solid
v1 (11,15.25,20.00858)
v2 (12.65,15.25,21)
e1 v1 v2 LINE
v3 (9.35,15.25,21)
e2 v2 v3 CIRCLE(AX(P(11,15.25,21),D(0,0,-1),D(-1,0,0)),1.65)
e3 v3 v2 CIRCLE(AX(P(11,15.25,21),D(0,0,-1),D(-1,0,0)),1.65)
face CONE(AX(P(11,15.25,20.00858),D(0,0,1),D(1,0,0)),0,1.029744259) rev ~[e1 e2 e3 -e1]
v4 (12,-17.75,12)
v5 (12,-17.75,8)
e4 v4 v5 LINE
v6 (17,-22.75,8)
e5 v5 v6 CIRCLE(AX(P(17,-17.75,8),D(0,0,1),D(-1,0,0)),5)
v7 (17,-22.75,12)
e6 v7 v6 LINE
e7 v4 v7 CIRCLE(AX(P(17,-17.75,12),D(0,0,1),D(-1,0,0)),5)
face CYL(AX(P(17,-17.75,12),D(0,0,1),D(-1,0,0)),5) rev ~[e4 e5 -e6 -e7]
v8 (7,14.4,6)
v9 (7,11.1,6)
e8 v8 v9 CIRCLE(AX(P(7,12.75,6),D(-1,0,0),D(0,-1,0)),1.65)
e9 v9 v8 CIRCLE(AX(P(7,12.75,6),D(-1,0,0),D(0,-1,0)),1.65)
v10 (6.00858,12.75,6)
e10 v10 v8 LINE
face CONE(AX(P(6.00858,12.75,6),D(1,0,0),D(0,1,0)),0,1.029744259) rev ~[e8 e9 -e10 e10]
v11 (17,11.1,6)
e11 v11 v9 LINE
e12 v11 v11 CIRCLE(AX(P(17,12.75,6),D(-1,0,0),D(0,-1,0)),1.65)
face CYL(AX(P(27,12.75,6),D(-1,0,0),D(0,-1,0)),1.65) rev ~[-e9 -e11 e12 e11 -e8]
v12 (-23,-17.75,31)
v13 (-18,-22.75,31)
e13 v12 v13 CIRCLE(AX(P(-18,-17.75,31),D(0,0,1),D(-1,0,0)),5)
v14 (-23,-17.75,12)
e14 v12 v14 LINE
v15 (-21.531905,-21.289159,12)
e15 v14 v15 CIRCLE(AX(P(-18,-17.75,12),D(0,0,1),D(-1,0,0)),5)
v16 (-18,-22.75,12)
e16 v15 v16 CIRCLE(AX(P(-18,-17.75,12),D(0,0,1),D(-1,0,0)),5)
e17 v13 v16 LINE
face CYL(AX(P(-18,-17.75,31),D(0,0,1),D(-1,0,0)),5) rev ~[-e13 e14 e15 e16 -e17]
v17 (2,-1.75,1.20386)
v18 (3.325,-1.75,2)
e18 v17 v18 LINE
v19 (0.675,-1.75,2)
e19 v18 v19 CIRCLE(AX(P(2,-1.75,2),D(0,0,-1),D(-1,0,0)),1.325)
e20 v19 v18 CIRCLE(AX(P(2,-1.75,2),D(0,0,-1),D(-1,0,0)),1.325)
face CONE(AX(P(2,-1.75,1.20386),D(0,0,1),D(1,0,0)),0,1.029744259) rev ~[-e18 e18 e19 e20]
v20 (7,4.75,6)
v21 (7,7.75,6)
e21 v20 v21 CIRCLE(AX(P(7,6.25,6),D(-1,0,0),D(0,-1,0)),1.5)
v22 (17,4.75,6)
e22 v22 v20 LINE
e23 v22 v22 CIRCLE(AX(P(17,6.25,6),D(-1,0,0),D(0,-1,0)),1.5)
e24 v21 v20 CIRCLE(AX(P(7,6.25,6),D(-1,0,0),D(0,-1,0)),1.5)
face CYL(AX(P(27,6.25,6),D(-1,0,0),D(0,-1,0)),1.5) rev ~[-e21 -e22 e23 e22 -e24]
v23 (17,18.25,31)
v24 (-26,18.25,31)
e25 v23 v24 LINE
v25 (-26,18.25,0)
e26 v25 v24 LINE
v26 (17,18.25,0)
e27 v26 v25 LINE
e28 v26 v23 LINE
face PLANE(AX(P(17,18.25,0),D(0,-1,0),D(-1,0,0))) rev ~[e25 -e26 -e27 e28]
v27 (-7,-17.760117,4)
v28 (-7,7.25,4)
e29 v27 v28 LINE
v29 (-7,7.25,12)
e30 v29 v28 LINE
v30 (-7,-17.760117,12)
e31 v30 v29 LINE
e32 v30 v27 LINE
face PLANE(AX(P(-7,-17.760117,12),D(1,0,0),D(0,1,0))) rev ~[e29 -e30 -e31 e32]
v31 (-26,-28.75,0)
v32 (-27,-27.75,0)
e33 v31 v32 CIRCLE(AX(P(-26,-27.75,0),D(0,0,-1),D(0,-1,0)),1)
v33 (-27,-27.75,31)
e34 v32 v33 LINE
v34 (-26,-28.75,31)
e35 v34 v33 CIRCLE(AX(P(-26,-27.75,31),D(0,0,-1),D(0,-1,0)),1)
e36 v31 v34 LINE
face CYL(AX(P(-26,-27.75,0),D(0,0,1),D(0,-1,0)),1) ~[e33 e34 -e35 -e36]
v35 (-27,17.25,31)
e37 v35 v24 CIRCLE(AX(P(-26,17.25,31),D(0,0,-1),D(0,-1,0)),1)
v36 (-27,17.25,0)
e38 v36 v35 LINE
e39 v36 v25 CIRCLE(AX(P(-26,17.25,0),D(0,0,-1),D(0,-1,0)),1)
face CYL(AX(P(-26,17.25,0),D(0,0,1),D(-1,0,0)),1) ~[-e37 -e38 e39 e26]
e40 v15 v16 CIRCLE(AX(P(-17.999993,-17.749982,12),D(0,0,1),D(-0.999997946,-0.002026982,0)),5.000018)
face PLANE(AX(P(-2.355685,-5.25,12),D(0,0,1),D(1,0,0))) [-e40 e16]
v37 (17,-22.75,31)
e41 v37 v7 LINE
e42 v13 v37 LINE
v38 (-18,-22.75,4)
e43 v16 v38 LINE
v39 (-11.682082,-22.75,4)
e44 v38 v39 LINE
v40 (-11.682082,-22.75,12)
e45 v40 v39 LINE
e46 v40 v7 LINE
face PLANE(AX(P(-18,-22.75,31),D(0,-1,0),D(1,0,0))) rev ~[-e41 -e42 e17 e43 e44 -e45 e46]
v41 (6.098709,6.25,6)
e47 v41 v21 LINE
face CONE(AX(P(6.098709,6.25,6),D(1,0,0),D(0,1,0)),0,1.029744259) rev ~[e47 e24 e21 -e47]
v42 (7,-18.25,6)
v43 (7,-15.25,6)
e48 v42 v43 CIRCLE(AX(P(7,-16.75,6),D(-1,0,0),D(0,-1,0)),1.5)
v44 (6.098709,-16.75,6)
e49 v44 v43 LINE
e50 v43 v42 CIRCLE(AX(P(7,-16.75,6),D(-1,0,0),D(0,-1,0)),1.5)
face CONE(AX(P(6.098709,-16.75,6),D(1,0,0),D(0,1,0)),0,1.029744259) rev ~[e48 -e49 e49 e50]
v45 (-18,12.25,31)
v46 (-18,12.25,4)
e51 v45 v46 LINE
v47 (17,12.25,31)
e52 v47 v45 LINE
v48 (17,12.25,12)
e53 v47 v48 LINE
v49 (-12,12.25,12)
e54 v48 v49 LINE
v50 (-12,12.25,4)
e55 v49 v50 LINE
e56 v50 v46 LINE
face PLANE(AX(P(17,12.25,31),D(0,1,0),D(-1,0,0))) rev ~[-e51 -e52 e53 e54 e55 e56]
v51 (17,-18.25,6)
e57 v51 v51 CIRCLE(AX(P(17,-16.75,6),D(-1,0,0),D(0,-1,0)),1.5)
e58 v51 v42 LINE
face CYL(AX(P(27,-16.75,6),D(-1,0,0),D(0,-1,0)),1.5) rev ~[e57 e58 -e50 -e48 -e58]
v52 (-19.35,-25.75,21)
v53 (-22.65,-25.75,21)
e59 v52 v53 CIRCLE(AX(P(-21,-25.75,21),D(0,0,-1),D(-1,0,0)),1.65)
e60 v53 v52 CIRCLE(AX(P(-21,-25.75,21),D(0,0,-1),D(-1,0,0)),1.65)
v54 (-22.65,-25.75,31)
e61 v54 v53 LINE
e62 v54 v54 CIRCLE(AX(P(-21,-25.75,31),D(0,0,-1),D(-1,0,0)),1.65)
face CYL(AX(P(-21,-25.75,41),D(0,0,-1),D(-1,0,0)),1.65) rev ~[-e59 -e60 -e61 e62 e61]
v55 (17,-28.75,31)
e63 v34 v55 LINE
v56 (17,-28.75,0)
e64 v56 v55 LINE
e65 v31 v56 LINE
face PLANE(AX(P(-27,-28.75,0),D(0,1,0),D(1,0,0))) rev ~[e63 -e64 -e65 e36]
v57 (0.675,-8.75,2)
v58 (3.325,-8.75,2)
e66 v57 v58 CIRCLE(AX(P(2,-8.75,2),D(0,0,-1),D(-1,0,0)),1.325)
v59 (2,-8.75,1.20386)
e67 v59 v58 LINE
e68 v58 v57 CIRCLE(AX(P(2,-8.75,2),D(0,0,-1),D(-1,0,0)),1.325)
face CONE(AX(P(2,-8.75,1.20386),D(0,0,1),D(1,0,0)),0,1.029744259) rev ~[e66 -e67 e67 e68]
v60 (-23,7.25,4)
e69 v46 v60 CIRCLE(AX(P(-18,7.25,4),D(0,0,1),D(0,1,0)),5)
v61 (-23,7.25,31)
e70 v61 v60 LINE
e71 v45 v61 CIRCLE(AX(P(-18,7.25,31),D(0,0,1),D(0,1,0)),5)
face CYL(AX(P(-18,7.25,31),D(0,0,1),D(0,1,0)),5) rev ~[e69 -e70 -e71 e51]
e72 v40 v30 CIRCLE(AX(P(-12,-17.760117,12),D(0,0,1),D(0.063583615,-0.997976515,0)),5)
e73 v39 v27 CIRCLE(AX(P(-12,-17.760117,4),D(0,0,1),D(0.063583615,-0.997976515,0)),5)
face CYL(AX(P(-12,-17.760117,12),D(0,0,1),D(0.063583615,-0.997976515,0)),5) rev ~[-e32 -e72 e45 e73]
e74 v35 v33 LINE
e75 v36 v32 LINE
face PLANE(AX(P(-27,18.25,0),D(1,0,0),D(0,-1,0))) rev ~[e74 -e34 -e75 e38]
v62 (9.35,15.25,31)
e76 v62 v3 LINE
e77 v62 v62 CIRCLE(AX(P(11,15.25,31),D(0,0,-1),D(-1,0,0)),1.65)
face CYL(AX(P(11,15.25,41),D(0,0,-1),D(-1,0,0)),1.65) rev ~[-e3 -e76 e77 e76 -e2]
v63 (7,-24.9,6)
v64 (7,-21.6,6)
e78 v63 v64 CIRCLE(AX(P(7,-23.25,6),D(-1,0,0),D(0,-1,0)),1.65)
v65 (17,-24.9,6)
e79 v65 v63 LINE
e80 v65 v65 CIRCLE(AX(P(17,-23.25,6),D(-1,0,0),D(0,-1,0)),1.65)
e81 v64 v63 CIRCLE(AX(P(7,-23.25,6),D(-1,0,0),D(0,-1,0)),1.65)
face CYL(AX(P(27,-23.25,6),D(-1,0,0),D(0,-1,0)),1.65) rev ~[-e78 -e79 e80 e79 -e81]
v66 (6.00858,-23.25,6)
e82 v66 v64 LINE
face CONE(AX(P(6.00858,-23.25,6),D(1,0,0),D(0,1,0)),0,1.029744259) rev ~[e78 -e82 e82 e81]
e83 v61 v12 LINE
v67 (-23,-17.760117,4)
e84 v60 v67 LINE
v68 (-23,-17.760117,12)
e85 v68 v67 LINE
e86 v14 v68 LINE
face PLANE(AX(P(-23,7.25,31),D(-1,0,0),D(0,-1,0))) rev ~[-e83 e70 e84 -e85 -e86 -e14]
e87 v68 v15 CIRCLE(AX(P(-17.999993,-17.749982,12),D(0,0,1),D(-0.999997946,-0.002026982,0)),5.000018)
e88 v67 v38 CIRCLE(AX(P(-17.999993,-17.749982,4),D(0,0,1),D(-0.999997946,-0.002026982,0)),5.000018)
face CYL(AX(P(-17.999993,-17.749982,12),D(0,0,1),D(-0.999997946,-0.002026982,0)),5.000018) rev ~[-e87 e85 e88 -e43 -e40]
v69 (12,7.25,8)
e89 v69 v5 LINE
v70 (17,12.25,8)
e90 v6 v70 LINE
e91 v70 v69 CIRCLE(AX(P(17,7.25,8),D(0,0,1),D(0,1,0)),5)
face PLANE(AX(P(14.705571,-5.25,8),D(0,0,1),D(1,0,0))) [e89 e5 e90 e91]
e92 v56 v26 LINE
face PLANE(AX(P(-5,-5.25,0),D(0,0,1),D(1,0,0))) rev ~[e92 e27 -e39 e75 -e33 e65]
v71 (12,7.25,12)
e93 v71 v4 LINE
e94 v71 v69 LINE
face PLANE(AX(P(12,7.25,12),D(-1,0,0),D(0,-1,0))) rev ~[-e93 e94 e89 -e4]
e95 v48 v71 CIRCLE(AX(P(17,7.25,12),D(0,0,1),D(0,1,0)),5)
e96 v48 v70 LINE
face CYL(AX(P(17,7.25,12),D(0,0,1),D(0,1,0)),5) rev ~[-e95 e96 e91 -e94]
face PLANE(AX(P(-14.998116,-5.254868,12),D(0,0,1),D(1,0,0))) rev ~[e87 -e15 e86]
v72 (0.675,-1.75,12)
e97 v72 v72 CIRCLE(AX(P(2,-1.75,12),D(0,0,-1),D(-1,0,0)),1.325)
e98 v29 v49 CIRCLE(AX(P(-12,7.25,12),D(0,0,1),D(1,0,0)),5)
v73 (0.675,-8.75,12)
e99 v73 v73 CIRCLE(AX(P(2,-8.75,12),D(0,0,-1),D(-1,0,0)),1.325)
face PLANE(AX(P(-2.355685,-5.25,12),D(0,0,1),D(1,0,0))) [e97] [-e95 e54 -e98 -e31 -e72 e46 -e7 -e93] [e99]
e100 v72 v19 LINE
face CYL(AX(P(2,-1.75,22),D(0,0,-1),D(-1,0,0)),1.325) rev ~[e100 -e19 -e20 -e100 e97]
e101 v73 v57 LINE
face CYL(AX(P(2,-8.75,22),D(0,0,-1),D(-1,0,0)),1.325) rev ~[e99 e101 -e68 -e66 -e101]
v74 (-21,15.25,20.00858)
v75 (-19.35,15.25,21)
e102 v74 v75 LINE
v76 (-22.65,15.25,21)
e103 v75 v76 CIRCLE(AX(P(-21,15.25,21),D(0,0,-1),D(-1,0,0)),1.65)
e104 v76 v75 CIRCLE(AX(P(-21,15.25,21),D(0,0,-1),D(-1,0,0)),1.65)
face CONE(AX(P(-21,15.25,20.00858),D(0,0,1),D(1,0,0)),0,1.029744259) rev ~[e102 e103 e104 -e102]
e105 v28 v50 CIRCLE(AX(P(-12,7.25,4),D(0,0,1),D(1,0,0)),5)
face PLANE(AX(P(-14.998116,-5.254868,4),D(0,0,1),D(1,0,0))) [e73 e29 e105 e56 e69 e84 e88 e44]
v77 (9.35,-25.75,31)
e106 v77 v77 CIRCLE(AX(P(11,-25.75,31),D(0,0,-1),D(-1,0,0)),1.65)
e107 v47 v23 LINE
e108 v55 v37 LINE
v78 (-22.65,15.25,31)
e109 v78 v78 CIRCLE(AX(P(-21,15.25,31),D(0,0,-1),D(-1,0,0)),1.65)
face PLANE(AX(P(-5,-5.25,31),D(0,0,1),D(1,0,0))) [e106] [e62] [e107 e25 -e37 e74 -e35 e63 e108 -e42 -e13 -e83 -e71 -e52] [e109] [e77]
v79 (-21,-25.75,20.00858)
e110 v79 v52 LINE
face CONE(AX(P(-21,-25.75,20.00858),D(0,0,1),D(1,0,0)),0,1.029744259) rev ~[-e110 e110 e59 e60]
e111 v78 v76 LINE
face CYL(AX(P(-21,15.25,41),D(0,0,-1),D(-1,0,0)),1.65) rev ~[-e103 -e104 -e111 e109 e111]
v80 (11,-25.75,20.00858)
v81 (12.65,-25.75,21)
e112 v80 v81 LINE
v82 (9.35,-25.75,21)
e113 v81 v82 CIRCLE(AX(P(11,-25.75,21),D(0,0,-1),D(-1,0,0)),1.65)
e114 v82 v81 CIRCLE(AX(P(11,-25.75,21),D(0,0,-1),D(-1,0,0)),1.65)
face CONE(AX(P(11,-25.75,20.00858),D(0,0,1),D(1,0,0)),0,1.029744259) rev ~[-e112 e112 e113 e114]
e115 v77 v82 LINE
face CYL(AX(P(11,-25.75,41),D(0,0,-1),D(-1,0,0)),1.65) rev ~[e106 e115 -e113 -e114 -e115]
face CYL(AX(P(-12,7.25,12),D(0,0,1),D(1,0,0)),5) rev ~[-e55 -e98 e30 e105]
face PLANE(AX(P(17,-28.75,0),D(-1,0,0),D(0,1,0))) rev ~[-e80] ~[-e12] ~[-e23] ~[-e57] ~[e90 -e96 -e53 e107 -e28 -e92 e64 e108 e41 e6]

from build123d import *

# Parameters (mm, degrees)
F1_DEPTH  = 31
F3_DEPTH  = 19
F5_DEPTH  = 8
F8_D      = 3.3
F8_DEPTH  = 10
F8_TIP    = 0.9914200214
F9_DEPTH  = 4
F11_D     = 2.65
F11_DEPTH = 10
F11_TIP   = 0.7961403202
F13_D     = 3
F13_DEPTH = 10
F13_TIP   = 0.9012909285
F14_D     = 3.3
F14_DEPTH = 10
F14_TIP   = 0.9914200214
F15_R     = 1


# Not quite as in the source:
# - ends of sketch curves that miss each other by under 0.0002 mm in the source are joined


with BuildPart() as f1:
    # F0 (on Top) → F1 (new body)
    with BuildSketch(Plane.XY):
        Polygon((-27, -28.75), (0, -28.75), (17, -28.75), (17, 18.25), (-27, 18.25), align=None)
    extrude(amount=F1_DEPTH)

    # F2 (on face) → F3 (cut)
    with BuildSketch(Plane.XY.offset(31)):
        with BuildLine():
            Line((17, -22.75), (17, 12.25))
            Line((17, 12.25), (-18, 12.25))
            ThreePointArc((-18, 12.25), (-21.5355339059, 10.7855339059), (-23, 7.25))
            Line((-23, 7.25), (-23, -17.75))
            ThreePointArc((-23, -17.75), (-21.5355339059, -21.2855339059), (-18, -22.75))
            Line((-18, -22.75), (17, -22.75))
        make_face()
    extrude(amount=-F3_DEPTH, mode=Mode.SUBTRACT)

    # F4 (on face) → F5 (cut)
    with BuildSketch(Plane.XY.offset(12)):
        with BuildLine():
            Line((-7, -17.7601174265), (-7, -5.25))
            Line((-7, -5.25), (-7, 7.25))
            ThreePointArc((-7, 7.25), (-8.4644660941, 10.7855339059), (-12, 12.25))
            Line((-12, 12.25), (-18, 12.25))
            ThreePointArc((-18, 12.25), (-21.5355339059, 10.7855339059), (-23, 7.25))
            Line((-23, 7.25), (-23, -17.75))
            Line((-23, -17.75), (-23, -17.7601174265))
            ThreePointArc((-23, -17.7601174265), (-21.5319550515, -21.2891091414), (-18, -22.75))
            Line((-18, -22.75), (-11.6820819243, -22.75))
            ThreePointArc((-11.6820819243, -22.75), (-8.3537971547, -21.1814044374), (-7, -17.7601174265))
        make_face()
    extrude(amount=-F5_DEPTH, mode=Mode.SUBTRACT)

    # F8
    with Locations(Plane.XY.offset(31)):
        with Locations((-21, 15.25), (-21, -25.75), (11, -25.75), (11, 15.25)):
            Hole(F8_D / 2, depth=F8_DEPTH)
            with Locations((0, 0, -(F8_DEPTH + F8_TIP / 2))):  # 118° drill point
                Cone(0, F8_D / 2, F8_TIP, mode=Mode.SUBTRACT)

    # F6 (on face) → F9 (cut)
    with BuildSketch(Plane.XY.offset(12)):
        with BuildLine():
            Line((17, -22.75), (17, 12.25))
            ThreePointArc((17, 12.25), (13.4644660941, 10.7855339059), (12, 7.25))
            Line((12, 7.25), (12, -17.75))
            ThreePointArc((12, -17.75), (13.4644660941, -21.2855339059), (17, -22.75))
        make_face()
    extrude(amount=-F9_DEPTH, mode=Mode.SUBTRACT)

    # F11
    with Locations(Plane.XY.offset(12)):
        with Locations((2, -1.75), (2, -8.75)):
            Hole(F11_D / 2, depth=F11_DEPTH)
            with Locations((0, 0, -(F11_DEPTH + F11_TIP / 2))):  # 118° drill point
                Cone(0, F11_D / 2, F11_TIP, mode=Mode.SUBTRACT)

    # F13
    with Locations(Plane.YZ.offset(17)):
        with Locations((-16.75, 6), (6.25, 6)):
            Hole(F13_D / 2, depth=F13_DEPTH)
            with Locations((0, 0, -(F13_DEPTH + F13_TIP / 2))):  # 118° drill point
                Cone(0, F13_D / 2, F13_TIP, mode=Mode.SUBTRACT)

    # F14
    with Locations(Plane.YZ.offset(17)):
        with Locations((12.75, 6), (-23.25, 6)):
            Hole(F14_D / 2, depth=F14_DEPTH)
            with Locations((0, 0, -(F14_DEPTH + F14_TIP / 2))):  # 118° drill point
                Cone(0, F14_D / 2, F14_TIP, mode=Mode.SUBTRACT)

    # F15
    f15_edges = [f1.edges().sort_by_distance(p)[0] for p in [
        (-27, -28.75, 15.5),
        (-27, 18.25, 15.5),
    ]]
    fillet(f15_edges, radius=F15_R)


solid = f1.part
